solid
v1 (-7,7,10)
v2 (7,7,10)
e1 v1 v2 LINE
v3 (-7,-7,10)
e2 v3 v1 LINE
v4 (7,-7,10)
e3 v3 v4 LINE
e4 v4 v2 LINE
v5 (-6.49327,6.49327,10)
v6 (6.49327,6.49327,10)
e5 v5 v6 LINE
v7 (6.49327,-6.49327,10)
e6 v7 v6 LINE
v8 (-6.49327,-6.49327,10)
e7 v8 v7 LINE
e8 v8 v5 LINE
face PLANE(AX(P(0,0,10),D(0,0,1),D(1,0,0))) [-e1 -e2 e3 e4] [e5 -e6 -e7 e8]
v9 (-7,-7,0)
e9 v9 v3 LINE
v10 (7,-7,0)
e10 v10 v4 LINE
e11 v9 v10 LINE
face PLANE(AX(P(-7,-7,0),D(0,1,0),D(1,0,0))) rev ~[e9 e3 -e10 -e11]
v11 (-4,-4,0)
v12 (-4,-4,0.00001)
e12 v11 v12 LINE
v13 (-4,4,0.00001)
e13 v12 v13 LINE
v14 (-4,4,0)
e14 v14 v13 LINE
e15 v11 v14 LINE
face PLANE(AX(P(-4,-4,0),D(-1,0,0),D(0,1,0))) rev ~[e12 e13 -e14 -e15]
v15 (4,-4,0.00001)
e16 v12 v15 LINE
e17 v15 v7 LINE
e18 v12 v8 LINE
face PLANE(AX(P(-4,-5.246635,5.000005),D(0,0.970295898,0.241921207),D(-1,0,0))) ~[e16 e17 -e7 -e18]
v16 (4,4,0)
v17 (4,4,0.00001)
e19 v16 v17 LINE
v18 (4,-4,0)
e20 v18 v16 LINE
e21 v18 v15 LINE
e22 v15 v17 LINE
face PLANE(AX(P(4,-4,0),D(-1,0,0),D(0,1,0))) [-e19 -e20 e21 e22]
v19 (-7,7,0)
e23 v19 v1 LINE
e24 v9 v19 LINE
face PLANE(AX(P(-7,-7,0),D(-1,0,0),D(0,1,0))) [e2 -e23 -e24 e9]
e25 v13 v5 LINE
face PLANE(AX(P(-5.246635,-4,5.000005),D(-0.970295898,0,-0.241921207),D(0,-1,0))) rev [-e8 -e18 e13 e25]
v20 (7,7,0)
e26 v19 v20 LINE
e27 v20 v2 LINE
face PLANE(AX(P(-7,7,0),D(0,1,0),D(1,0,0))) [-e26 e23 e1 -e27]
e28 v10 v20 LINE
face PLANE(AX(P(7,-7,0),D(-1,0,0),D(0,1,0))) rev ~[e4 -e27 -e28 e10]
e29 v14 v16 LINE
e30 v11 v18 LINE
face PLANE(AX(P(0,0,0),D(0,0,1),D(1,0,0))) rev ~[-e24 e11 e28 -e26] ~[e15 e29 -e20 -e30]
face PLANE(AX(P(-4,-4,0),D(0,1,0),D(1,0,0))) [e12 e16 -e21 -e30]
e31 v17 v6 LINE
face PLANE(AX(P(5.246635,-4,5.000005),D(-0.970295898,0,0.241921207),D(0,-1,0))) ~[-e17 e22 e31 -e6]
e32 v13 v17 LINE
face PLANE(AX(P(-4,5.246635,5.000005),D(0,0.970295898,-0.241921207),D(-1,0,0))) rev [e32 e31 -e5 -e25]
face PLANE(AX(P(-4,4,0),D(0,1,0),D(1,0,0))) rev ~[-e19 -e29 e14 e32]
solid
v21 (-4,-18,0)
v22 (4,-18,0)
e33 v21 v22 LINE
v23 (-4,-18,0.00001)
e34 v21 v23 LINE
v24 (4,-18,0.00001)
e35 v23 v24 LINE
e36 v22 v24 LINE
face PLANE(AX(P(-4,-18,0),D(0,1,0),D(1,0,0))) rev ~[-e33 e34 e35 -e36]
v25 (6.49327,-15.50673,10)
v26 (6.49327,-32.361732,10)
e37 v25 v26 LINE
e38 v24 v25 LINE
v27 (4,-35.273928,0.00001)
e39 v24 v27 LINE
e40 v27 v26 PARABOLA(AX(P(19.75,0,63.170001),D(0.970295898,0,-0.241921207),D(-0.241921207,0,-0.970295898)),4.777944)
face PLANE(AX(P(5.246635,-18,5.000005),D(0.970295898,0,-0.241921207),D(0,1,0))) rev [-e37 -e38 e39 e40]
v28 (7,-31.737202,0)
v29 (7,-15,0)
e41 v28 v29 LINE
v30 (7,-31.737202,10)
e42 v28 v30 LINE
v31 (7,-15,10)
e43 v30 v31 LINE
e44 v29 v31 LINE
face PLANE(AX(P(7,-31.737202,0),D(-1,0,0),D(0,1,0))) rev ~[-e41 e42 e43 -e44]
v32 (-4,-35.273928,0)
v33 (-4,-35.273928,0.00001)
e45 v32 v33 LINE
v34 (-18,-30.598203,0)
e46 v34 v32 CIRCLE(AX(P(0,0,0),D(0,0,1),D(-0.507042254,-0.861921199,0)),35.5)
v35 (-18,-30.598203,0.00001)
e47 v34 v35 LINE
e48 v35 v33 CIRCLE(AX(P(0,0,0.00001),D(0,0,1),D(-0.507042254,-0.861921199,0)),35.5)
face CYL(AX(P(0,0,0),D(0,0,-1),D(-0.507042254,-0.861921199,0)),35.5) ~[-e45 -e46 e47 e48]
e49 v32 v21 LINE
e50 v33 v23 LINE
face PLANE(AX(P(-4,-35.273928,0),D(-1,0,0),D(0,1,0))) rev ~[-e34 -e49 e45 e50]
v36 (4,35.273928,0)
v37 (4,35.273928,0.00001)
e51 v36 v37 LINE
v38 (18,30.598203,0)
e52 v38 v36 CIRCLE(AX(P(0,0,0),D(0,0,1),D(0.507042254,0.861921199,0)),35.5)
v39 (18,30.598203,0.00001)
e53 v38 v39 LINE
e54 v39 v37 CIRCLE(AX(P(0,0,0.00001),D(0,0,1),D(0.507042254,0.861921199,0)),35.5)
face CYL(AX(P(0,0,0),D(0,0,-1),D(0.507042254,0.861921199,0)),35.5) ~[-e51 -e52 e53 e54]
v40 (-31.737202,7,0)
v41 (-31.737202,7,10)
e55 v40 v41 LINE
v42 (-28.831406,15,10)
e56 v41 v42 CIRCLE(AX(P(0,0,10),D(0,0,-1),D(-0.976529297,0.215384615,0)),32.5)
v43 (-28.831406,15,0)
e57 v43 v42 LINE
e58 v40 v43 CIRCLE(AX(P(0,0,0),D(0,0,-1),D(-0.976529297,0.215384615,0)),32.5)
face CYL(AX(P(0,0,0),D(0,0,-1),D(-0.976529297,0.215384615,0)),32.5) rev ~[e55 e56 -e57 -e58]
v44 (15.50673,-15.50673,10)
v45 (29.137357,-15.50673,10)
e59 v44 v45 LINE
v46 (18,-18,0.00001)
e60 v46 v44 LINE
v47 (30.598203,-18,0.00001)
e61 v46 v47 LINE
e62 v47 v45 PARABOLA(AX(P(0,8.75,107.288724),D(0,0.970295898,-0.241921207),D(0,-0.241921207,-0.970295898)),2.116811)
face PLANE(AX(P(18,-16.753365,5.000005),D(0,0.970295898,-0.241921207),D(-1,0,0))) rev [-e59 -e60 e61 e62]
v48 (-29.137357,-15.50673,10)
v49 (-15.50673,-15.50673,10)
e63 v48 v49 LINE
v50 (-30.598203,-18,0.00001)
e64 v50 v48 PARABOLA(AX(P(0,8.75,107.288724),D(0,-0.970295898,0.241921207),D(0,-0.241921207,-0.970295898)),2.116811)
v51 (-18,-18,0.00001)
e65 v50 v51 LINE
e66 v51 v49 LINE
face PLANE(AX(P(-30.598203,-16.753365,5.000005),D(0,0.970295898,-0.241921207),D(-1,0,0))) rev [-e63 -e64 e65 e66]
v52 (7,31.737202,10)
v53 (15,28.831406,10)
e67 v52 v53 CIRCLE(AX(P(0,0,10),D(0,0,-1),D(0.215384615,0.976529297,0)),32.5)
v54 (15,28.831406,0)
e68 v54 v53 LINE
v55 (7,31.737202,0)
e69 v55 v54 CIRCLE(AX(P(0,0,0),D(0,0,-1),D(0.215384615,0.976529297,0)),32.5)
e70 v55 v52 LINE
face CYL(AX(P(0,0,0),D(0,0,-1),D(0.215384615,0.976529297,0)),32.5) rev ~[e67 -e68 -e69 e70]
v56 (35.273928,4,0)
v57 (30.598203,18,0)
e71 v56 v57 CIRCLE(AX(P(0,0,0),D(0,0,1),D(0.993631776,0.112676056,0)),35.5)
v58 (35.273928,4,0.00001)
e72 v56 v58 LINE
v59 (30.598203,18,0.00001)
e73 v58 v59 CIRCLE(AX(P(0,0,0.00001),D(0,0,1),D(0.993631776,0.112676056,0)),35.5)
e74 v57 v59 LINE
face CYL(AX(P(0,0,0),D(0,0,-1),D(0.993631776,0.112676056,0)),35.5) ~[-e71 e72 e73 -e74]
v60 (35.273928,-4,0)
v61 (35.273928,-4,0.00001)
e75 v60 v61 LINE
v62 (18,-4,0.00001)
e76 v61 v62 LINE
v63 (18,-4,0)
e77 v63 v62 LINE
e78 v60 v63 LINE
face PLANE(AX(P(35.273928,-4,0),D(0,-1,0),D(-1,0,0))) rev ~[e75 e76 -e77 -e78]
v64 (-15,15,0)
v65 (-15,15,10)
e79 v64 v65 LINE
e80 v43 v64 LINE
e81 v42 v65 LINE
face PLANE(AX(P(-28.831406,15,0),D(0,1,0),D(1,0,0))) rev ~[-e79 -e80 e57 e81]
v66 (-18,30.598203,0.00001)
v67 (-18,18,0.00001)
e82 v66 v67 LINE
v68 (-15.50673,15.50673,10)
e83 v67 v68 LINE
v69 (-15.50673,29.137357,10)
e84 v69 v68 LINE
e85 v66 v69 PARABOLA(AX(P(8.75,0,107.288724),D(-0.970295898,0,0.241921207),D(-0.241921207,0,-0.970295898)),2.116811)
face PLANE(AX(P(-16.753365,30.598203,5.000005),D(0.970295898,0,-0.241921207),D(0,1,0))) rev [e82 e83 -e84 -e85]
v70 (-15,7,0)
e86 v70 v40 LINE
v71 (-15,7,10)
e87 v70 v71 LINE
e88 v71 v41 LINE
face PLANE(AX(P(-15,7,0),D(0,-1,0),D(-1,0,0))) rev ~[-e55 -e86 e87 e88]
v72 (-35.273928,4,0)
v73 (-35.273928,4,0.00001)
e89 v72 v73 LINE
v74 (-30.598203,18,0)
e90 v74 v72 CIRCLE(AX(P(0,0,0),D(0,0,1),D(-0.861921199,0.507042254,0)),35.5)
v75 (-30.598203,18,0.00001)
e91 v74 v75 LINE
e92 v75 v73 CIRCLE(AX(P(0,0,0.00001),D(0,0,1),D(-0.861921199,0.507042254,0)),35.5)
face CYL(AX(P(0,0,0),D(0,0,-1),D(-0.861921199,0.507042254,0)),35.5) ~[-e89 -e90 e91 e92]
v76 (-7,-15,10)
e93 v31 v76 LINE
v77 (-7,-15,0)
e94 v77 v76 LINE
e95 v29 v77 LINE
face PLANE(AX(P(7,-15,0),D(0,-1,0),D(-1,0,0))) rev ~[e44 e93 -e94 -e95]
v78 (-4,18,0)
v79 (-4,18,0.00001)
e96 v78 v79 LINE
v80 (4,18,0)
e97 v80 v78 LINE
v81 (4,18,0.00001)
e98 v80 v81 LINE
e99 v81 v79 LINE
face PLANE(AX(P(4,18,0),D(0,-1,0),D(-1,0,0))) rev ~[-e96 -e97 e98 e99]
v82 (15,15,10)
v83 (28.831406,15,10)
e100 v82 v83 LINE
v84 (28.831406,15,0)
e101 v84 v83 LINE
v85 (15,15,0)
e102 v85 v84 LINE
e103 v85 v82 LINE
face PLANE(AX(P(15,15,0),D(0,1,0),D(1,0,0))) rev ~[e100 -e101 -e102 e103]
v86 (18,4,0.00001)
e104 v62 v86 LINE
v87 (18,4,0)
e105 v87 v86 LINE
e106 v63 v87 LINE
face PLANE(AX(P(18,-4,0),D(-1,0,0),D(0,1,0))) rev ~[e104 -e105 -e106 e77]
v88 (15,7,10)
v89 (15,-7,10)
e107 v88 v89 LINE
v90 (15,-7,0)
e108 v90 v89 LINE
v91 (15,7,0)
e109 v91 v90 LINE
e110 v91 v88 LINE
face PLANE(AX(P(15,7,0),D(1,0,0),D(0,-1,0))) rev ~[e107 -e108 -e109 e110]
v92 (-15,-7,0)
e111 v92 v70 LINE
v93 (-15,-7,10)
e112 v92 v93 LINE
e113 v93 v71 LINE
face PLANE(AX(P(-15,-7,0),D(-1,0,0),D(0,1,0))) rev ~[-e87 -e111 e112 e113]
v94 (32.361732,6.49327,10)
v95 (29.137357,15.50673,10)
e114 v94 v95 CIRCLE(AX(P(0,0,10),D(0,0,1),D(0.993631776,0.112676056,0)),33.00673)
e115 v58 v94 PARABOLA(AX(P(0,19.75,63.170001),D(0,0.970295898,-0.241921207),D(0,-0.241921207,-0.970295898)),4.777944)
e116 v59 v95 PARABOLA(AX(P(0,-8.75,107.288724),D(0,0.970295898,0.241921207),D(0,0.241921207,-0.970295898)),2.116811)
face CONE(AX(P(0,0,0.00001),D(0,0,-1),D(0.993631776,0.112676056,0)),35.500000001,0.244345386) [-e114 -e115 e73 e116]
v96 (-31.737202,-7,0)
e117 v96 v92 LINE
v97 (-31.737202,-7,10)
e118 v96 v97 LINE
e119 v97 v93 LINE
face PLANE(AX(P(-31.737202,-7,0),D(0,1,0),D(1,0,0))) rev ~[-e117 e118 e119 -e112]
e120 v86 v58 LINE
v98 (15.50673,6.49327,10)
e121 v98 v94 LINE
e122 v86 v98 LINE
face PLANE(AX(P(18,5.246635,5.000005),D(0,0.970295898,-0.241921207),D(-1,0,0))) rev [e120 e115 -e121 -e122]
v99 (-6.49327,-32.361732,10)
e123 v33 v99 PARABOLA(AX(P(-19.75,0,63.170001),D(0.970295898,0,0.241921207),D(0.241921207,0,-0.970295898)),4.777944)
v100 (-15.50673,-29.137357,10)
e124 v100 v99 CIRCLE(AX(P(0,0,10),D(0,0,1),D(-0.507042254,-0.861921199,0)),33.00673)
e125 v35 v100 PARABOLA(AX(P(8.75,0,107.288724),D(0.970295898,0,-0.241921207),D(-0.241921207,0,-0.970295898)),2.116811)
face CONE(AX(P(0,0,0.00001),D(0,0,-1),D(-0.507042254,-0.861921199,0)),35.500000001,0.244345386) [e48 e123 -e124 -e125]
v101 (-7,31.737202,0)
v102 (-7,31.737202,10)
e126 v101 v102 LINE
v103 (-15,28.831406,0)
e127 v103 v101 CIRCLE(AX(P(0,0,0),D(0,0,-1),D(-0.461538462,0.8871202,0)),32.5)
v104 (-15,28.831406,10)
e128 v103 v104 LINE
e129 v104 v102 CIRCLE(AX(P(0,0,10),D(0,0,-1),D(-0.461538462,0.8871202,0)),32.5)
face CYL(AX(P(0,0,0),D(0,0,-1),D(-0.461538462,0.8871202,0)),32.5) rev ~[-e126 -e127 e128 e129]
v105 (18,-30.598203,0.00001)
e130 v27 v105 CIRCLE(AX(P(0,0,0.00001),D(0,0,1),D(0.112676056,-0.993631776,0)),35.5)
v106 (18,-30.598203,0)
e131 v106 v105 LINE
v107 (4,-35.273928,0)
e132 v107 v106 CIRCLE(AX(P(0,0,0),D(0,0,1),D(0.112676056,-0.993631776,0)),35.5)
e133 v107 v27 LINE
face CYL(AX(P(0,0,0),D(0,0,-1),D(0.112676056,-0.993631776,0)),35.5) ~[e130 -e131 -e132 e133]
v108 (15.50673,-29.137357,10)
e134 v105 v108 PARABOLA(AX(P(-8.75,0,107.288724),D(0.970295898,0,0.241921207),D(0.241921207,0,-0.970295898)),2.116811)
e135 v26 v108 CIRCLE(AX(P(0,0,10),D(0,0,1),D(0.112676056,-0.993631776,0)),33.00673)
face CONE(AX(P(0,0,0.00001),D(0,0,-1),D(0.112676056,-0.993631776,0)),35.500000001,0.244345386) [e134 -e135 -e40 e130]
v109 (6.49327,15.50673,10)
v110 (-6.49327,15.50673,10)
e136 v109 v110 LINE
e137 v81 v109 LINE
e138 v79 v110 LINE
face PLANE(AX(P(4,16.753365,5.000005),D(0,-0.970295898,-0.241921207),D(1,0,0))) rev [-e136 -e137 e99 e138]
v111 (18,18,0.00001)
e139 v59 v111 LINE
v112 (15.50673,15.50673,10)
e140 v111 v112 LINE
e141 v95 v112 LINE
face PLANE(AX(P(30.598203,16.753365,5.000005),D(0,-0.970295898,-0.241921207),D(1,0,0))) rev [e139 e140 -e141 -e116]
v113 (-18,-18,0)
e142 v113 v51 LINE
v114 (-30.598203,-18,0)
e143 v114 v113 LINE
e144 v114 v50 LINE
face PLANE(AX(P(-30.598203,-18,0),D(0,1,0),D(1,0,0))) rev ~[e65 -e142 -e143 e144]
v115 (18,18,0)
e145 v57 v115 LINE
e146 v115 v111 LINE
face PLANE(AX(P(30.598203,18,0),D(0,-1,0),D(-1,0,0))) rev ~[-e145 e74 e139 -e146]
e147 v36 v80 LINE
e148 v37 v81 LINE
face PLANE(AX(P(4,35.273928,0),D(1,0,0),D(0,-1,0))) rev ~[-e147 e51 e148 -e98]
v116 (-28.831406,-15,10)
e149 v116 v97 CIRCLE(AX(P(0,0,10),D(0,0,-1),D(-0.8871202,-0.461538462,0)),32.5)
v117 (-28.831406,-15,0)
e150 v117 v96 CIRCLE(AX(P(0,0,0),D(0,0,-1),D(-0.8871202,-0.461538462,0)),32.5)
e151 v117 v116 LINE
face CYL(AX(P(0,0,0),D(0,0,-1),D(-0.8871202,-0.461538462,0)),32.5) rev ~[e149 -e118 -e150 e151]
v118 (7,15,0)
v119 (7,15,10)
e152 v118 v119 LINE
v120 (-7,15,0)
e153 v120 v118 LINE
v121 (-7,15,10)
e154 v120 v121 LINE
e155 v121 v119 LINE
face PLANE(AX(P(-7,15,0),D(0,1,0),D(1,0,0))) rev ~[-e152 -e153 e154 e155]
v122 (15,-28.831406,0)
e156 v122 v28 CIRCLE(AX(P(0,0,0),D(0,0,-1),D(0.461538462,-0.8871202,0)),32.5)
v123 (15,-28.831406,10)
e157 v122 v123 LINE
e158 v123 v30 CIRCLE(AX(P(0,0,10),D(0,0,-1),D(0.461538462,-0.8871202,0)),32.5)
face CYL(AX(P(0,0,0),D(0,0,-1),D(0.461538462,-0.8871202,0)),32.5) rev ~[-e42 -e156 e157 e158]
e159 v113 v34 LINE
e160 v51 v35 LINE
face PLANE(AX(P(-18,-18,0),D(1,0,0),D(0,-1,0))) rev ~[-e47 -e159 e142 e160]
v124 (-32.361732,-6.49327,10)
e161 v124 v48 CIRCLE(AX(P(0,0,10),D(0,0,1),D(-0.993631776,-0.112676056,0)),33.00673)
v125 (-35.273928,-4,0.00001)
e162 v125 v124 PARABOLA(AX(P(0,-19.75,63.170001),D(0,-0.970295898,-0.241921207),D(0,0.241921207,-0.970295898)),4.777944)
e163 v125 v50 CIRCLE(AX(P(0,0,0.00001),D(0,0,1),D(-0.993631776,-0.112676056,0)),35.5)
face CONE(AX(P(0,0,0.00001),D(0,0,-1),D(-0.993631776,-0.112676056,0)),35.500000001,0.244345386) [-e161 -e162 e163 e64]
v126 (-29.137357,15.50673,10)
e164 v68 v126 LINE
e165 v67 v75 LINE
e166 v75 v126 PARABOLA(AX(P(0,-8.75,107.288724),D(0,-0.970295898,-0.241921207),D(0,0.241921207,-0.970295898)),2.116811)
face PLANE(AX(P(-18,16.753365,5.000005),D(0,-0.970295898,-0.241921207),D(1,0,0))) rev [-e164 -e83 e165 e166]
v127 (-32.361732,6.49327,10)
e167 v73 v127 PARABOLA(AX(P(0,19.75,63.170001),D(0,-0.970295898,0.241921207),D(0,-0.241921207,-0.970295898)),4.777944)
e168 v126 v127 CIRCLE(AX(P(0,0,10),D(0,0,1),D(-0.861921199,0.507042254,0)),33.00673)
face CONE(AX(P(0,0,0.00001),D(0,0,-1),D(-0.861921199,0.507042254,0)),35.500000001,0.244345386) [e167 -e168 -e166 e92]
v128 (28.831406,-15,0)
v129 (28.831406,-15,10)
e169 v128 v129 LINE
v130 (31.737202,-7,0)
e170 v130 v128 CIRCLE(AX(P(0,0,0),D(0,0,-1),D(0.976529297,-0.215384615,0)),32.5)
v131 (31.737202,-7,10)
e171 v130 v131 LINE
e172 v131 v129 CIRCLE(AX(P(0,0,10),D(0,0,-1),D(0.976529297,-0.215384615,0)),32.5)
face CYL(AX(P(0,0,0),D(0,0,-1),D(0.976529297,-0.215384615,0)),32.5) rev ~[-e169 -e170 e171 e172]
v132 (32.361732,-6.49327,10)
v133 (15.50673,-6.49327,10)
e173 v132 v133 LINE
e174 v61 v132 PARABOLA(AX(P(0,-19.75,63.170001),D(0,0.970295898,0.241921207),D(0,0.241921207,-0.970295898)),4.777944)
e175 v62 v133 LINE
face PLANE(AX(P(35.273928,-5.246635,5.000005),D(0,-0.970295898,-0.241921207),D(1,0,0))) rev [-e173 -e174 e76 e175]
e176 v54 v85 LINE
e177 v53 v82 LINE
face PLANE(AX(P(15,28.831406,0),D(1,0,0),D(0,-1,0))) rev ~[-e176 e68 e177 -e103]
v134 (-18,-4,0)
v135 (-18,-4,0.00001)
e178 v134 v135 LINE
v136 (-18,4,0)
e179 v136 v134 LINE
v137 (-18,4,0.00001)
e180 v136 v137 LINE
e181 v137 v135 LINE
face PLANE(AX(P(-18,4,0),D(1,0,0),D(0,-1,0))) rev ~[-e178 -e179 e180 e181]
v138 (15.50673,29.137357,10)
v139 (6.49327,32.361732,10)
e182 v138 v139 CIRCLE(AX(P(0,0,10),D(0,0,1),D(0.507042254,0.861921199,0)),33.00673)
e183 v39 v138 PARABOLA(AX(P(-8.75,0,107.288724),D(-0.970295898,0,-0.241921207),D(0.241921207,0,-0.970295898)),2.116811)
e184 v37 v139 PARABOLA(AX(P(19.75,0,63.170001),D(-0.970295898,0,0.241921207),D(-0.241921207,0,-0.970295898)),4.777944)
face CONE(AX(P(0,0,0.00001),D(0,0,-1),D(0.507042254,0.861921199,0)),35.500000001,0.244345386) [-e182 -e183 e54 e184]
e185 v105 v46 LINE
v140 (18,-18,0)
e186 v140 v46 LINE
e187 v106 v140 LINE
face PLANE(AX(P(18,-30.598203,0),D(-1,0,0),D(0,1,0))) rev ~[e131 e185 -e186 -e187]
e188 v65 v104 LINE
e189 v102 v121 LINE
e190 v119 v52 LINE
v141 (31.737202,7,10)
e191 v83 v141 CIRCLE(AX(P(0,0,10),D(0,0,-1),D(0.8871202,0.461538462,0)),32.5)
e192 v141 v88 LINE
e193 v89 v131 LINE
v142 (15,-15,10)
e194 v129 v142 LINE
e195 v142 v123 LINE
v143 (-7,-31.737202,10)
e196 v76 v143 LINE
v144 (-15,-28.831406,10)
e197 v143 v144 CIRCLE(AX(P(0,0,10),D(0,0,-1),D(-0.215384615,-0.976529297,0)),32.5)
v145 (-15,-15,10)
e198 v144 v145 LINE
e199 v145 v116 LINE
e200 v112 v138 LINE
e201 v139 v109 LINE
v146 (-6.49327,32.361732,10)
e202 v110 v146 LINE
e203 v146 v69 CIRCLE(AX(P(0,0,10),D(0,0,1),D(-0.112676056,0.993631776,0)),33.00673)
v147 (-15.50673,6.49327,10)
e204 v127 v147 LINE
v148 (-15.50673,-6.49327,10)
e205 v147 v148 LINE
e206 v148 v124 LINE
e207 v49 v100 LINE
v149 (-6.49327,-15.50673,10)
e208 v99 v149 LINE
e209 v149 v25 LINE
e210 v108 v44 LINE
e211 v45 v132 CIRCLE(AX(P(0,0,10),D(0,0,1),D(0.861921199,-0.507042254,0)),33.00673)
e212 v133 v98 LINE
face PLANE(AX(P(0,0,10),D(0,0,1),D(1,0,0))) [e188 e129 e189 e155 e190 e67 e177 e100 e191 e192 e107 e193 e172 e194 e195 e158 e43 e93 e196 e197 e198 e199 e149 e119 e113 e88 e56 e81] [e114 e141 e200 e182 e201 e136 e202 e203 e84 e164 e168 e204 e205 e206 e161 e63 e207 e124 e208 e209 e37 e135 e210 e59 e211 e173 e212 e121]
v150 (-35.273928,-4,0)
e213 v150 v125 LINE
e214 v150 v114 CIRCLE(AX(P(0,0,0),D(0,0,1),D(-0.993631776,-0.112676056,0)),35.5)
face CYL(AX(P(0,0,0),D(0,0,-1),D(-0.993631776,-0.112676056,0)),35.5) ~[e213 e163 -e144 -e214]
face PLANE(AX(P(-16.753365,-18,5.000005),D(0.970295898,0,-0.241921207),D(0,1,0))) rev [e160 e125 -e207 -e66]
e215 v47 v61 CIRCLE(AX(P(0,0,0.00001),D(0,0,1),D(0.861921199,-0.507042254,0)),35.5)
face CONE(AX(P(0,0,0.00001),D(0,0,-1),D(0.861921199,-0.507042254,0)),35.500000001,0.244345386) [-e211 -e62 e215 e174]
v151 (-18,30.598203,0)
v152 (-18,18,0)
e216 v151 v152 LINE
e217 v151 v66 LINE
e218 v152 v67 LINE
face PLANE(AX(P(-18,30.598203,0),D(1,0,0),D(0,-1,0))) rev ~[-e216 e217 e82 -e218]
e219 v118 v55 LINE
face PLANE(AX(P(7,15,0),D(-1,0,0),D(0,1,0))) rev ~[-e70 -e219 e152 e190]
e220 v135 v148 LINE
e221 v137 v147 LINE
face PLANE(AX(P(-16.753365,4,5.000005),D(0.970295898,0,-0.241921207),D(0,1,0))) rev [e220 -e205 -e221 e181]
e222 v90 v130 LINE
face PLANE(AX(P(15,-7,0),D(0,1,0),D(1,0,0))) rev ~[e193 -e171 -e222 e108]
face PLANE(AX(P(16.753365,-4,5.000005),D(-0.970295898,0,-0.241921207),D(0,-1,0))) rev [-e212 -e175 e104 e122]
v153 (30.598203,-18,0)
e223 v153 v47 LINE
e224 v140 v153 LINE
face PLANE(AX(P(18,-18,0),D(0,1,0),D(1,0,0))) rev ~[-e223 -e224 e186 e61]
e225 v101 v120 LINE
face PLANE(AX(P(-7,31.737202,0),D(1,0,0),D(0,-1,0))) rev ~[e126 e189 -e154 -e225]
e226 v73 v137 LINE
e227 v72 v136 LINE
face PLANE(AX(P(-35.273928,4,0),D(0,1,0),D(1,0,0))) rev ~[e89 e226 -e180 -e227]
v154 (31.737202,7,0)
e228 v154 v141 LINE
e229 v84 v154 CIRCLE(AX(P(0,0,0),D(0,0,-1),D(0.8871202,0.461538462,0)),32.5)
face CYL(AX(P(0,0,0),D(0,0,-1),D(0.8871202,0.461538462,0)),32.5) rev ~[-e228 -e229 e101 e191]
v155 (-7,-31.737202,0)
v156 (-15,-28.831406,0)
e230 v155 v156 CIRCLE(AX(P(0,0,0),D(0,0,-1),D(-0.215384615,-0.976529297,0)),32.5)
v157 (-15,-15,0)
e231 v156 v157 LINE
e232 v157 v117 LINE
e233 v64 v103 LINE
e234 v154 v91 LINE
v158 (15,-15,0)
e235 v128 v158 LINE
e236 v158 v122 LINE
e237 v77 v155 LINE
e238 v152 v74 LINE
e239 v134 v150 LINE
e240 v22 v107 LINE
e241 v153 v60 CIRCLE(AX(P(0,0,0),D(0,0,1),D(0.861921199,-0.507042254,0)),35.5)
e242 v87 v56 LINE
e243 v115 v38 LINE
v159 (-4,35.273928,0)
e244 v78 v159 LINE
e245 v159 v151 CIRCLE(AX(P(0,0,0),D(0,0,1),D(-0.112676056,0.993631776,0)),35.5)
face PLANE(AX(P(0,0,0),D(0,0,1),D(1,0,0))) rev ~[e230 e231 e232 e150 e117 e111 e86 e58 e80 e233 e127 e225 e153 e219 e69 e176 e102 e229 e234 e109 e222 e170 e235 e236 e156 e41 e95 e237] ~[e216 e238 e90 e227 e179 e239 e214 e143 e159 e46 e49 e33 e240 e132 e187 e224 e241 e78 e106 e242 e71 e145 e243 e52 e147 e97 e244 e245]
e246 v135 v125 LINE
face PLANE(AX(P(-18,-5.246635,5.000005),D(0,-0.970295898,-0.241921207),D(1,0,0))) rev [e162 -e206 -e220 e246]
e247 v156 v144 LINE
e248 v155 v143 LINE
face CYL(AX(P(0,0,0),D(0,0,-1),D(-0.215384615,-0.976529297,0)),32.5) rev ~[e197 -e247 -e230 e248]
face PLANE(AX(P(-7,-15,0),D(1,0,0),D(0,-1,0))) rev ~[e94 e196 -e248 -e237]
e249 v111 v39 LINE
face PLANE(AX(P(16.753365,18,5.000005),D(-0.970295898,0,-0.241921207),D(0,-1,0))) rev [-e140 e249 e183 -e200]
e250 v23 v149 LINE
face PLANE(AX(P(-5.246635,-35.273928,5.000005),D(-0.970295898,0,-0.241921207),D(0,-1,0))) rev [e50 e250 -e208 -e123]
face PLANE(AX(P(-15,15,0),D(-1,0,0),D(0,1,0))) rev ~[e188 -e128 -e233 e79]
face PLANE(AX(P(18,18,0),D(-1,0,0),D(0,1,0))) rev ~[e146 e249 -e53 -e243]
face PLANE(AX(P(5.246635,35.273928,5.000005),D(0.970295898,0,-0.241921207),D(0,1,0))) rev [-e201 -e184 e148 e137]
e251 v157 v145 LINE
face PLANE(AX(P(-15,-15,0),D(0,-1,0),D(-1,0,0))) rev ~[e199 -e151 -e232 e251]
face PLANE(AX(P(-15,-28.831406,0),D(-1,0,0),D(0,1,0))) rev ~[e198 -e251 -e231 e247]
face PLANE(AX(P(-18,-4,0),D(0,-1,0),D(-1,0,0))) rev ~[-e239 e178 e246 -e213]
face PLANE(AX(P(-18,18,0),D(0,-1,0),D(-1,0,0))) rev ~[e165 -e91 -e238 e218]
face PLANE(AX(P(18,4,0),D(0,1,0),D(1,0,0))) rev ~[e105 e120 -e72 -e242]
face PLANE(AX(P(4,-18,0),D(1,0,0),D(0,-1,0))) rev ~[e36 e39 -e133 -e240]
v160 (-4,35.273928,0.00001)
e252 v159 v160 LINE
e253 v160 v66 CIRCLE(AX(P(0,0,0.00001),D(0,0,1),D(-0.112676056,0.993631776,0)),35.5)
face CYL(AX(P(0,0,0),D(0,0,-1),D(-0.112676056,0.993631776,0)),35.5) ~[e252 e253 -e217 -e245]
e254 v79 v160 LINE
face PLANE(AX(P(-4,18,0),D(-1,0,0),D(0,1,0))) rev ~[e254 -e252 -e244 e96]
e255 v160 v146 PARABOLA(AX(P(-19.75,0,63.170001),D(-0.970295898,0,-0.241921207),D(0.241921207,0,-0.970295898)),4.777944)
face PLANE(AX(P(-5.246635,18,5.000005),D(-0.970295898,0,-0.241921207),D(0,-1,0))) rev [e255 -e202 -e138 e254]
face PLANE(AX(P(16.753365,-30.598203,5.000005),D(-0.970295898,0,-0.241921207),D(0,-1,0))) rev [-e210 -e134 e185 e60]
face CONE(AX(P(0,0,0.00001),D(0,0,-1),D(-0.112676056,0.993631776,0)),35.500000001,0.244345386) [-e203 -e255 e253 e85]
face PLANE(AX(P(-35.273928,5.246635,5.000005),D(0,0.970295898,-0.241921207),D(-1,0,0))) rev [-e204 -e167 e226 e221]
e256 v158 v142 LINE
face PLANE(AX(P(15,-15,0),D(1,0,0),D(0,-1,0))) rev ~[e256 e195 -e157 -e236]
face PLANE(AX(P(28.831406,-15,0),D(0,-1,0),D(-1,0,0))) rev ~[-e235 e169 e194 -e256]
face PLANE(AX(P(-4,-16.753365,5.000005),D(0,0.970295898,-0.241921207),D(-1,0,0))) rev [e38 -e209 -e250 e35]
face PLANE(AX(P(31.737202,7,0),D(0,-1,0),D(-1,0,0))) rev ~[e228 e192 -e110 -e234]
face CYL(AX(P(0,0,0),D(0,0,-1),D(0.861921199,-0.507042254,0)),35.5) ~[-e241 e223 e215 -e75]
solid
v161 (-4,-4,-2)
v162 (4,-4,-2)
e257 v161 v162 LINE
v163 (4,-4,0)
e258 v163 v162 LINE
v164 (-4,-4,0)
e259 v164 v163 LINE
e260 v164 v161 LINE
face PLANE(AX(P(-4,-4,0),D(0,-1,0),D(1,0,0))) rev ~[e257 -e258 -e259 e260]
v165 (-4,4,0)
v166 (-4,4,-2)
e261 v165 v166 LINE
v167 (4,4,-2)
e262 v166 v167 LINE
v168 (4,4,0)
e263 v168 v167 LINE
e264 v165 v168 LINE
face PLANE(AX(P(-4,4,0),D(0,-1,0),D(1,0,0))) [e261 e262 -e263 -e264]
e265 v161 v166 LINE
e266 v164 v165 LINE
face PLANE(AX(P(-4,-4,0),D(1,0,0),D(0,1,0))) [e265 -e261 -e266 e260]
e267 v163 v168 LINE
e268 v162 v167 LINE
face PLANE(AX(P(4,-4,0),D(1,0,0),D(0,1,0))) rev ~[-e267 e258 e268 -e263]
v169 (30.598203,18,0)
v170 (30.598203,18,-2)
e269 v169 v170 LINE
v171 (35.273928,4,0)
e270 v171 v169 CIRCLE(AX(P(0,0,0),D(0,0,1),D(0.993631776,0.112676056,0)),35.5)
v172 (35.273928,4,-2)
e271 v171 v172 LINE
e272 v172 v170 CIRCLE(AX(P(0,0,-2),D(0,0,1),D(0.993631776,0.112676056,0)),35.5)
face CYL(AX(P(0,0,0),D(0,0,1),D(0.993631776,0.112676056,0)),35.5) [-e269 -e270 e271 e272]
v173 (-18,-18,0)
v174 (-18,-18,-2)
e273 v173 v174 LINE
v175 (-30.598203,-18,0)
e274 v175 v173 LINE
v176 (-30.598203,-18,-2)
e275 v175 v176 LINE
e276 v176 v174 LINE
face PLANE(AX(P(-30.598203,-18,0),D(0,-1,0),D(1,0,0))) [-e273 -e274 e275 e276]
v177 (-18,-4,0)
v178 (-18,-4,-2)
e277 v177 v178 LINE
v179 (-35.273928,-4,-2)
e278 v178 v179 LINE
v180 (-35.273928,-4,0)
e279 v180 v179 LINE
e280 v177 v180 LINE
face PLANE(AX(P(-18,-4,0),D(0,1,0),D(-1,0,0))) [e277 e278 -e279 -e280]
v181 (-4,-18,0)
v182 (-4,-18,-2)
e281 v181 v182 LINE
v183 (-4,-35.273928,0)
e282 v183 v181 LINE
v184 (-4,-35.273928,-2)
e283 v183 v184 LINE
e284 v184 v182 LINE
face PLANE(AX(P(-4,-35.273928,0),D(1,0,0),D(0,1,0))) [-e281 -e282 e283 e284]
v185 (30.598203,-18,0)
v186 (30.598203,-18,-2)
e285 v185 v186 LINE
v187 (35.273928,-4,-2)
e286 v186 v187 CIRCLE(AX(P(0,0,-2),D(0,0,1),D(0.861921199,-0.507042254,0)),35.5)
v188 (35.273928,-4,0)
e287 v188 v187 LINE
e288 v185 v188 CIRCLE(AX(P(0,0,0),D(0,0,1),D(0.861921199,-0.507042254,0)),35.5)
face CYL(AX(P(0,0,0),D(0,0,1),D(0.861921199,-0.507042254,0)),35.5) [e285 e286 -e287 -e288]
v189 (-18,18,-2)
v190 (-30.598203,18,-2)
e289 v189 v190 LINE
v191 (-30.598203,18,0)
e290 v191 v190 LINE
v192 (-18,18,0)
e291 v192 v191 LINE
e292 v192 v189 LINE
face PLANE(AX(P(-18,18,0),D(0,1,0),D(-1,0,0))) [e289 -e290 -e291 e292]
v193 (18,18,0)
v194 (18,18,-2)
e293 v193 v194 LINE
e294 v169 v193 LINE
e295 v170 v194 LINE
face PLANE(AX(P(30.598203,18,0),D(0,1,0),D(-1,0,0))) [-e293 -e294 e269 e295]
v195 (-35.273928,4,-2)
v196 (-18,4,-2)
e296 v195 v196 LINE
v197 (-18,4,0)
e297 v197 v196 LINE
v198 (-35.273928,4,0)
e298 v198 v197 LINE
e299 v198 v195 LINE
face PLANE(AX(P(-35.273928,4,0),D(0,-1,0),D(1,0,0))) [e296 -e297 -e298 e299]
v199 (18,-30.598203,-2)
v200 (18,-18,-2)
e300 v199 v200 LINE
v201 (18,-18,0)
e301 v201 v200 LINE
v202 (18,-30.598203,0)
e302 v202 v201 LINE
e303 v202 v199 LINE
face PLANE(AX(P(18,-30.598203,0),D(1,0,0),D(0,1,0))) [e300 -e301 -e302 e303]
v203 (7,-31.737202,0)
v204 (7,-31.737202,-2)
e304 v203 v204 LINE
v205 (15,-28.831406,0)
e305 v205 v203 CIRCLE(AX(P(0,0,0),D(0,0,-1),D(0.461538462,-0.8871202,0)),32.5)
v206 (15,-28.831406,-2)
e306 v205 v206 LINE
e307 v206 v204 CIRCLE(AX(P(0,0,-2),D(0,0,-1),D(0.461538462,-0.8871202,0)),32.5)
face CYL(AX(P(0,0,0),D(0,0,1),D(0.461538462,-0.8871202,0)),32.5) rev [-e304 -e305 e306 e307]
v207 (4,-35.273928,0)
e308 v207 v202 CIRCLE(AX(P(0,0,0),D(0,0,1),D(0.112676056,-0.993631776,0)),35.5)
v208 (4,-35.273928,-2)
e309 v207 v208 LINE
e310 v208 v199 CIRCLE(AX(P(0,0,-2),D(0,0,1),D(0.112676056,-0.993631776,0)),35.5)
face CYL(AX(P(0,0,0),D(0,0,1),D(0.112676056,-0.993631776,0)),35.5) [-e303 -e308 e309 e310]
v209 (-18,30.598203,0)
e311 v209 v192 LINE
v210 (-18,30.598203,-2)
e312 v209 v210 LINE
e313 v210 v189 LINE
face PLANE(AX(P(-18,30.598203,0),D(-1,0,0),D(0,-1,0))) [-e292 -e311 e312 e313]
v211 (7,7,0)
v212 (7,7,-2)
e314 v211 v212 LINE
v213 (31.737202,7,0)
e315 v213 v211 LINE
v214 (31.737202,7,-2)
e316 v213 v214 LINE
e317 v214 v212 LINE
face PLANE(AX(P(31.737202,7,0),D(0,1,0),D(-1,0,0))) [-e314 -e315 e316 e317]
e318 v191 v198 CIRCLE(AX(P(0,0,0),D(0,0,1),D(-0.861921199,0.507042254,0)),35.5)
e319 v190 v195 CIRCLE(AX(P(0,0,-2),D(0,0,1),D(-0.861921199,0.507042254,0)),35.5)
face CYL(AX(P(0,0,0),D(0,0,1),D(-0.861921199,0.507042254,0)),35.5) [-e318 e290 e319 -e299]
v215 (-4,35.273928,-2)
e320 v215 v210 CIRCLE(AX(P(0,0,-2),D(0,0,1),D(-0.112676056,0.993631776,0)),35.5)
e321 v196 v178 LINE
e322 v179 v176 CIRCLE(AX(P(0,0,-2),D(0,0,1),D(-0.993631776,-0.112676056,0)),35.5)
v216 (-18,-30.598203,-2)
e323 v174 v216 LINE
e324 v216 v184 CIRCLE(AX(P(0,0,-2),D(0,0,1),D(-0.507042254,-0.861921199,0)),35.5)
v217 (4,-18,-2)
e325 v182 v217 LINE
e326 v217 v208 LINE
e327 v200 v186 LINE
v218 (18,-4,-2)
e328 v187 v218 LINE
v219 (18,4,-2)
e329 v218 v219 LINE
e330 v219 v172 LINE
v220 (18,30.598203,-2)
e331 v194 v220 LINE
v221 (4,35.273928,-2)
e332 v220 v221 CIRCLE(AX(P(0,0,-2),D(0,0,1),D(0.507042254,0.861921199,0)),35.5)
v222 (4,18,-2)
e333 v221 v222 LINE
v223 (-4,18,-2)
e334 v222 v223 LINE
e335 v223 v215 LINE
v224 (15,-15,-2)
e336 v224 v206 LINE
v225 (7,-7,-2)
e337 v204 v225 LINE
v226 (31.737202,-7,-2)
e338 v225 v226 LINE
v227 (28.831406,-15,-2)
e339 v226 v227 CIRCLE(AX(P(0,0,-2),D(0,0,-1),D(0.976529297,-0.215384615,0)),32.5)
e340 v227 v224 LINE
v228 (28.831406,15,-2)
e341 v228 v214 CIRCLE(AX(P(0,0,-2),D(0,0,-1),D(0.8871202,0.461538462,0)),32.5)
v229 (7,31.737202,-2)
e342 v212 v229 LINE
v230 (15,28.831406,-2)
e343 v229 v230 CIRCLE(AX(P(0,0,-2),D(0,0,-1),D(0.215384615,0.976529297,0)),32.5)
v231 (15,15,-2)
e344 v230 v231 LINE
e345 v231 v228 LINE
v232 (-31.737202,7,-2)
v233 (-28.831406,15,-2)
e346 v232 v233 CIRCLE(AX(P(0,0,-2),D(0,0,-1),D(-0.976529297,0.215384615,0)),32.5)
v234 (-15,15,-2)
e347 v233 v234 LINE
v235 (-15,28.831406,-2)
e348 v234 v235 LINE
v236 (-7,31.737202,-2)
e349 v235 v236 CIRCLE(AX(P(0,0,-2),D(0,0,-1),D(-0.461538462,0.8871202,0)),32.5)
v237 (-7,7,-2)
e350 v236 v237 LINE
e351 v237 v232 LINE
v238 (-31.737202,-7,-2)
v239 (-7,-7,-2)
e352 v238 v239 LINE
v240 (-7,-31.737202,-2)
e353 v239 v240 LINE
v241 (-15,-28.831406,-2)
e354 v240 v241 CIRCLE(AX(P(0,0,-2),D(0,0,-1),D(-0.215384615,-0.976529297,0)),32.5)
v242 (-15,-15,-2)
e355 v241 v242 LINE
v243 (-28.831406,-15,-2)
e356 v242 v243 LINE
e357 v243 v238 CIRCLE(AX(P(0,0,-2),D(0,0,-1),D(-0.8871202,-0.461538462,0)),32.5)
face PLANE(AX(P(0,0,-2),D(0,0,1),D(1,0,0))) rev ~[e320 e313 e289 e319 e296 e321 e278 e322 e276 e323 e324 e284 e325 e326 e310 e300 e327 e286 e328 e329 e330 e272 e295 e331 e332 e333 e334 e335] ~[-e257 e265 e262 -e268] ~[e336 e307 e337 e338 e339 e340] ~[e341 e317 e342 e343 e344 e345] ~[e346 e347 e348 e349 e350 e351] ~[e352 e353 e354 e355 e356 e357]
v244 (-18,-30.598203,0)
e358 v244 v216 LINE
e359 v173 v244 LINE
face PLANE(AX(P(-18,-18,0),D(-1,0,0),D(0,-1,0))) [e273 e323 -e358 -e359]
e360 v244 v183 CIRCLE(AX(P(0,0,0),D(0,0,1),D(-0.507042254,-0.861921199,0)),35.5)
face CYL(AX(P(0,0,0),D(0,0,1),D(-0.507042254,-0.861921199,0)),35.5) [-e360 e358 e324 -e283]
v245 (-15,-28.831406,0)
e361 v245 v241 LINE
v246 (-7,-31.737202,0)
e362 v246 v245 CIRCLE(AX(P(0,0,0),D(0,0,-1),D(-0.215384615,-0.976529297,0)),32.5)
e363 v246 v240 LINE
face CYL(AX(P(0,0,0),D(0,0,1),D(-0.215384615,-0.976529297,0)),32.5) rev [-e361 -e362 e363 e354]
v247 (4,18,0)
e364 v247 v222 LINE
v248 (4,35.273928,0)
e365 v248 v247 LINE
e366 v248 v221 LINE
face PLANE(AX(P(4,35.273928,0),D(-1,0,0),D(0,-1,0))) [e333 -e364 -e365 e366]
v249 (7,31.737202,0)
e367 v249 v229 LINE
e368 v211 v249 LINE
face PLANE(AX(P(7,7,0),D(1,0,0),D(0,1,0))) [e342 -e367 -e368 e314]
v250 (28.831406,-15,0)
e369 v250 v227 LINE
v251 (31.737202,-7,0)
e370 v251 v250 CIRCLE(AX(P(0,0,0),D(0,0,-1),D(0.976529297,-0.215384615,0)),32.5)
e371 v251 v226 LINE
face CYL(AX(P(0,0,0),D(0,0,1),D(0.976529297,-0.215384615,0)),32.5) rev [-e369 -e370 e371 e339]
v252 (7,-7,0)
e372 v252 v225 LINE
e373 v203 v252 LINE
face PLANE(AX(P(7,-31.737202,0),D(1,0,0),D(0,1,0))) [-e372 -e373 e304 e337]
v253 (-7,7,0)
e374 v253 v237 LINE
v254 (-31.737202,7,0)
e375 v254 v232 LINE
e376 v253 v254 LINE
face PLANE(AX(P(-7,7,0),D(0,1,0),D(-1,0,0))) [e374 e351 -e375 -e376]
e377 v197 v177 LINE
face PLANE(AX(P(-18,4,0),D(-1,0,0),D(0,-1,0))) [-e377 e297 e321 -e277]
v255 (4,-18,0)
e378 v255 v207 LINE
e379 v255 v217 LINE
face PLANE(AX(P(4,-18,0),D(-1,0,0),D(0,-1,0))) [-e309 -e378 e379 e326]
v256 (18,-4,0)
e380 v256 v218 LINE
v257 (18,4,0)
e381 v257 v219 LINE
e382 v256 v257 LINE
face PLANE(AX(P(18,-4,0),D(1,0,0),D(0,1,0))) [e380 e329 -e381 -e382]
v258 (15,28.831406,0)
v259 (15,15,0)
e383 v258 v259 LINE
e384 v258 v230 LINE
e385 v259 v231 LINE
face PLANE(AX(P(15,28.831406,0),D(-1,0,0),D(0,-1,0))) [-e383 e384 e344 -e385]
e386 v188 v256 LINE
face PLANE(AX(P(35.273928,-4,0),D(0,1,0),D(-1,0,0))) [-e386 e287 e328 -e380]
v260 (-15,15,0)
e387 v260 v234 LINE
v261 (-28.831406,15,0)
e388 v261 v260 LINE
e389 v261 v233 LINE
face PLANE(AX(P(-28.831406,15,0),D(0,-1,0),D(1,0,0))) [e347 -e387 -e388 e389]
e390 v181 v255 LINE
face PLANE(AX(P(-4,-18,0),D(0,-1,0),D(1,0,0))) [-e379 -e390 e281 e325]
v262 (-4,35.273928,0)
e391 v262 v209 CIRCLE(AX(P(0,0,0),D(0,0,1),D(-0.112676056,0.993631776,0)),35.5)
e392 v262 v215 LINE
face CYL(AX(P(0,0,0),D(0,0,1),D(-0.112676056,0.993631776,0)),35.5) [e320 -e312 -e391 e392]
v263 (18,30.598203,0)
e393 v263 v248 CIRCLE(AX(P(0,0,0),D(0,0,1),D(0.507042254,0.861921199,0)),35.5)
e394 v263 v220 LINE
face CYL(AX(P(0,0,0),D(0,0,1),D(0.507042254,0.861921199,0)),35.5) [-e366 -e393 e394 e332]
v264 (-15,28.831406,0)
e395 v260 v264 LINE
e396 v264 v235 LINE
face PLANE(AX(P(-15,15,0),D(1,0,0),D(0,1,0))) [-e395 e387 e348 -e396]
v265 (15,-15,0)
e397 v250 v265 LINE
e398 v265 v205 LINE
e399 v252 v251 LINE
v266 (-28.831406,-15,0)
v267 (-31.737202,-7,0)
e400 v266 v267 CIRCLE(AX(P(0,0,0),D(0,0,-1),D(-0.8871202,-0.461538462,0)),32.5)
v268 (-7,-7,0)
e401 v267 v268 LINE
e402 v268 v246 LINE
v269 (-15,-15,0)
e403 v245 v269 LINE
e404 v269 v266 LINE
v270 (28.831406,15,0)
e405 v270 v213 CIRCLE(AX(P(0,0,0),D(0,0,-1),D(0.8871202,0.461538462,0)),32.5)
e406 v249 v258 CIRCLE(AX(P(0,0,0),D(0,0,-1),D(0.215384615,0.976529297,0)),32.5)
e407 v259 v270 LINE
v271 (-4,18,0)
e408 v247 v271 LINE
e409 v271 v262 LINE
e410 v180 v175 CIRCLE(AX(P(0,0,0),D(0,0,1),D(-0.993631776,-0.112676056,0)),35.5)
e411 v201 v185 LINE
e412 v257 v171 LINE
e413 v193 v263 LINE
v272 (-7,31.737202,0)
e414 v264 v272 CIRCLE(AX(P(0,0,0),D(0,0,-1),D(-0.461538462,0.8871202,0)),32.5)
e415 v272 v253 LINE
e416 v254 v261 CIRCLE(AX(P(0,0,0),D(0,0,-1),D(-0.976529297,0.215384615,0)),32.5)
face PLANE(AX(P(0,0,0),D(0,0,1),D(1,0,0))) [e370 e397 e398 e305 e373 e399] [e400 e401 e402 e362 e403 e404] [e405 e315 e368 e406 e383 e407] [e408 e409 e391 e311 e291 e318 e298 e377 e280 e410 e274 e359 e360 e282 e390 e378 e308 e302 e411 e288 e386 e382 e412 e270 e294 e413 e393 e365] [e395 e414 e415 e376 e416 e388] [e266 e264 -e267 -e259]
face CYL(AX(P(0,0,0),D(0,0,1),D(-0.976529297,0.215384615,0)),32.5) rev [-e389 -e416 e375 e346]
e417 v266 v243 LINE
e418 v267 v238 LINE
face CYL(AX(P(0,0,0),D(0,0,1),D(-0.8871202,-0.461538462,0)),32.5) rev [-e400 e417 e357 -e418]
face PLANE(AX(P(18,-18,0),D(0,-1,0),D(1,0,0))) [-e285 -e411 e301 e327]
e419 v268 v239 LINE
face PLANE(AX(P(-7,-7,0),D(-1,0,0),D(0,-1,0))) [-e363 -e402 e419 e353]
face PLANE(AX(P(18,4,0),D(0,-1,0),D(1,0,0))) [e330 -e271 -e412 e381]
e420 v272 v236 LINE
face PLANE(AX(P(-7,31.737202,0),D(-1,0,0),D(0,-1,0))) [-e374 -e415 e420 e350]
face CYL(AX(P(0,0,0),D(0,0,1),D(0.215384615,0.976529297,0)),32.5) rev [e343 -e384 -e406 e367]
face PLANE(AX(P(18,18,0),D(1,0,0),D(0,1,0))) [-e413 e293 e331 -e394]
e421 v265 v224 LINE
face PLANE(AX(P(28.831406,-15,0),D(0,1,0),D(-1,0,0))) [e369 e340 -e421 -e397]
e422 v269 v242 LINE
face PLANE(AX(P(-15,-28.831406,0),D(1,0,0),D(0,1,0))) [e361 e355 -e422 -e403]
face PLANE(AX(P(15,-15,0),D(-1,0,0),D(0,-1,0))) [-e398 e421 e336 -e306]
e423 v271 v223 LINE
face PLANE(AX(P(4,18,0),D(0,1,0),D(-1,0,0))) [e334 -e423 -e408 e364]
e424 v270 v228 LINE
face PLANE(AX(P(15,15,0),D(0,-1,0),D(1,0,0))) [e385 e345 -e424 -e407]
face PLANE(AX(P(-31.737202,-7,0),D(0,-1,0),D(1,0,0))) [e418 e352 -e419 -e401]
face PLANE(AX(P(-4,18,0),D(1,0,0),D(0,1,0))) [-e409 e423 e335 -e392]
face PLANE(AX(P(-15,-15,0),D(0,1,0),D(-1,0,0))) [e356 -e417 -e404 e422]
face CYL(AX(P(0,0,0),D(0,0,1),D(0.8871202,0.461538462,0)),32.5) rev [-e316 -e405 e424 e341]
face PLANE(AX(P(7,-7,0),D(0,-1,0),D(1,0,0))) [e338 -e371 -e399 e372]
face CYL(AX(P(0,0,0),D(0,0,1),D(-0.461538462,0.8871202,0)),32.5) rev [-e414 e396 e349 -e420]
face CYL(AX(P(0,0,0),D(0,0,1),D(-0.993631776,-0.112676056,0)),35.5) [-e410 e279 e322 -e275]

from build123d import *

# Parameters (mm, degrees)
F0_W     = 14
F0_H     = 14
F0_W_2   = 8
F0_H_2   = 8
F1_DEPTH = 10
F2_SIZE2 = 2.49327
F2_SIZE  = 9.99999
F3_SIZE2 = 2.49327
F3_SIZE  = 9.99999
F4_W     = 8
F4_H     = 8
F5_DEPTH = 2


# Not quite as in the source:
# - a fillet or chamfer is up to 0.001 mm smaller than in the source, because OpenCascade refuses the exact size
# - a feature names something its author has since deleted; it is built from what else it names


with BuildPart() as f1:
    # F0 (on Top) → F1 (new body)
    with BuildSketch(Plane.XY):
        Rectangle(F0_W, F0_H)
        Rectangle(F0_W_2, F0_H_2, mode=Mode.SUBTRACT)
    extrude(amount=F1_DEPTH)

    # F3 (size 10 and 2.4932800284 in the source; OpenCascade refuses exactly that, so slightly less here)
    f3_edges = [f1.edges().sort_by_distance(p)[0] for p in [
        (4, 0, 10),
        (0, -4, 10),
        (-4, 0, 10),
        (0, 4, 10),
    ]]
    chamfer(f3_edges, length=F3_SIZE, length2=F3_SIZE2)


with BuildPart() as f1b:
    # F0 (on Top) → F1, piece 2 (new body)
    with BuildSketch(Plane.XY):
        with BuildLine():
            ThreePointArc((-30.5982025616, 18), (-33.6717151002, 11.2456926069), (-35.2739280489, 4))
            Line((-35.2739280489, 4), (-18, 4))
            Line((-18, 4), (-18, -4))
            Line((-18, -4), (-35.2739280489, -4))
            ThreePointArc((-35.2739280489, -4), (-33.6717151002, -11.2456926069), (-30.5982025616, -18))
            Line((-30.5982025616, -18), (-18, -18))
            Line((-18, -18), (-18, -30.5982025616))
            ThreePointArc((-18, -30.5982025616), (-11.2456926069, -33.6717151002), (-4, -35.2739280489))
            Line((-4, -35.2739280489), (-4, -18))
            Line((-4, -18), (4, -18))
            Line((4, -18), (4, -35.2739280489))
            ThreePointArc((4, -35.2739280489), (11.2456926069, -33.6717151002), (18, -30.5982025616))
            Line((18, -30.5982025616), (18, -18))
            Line((18, -18), (30.5982025616, -18))
            ThreePointArc((30.5982025616, -18), (33.6717151002, -11.2456926069), (35.2739280489, -4))
            Line((35.2739280489, -4), (18, -4))
            Line((18, -4), (18, 4))
            Line((18, 4), (35.2739280489, 4))
            ThreePointArc((35.2739280489, 4), (33.6717151002, 11.2456926069), (30.5982025616, 18))
            Line((30.5982025616, 18), (18, 18))
            Line((18, 18), (18, 30.5982025616))
            ThreePointArc((18, 30.5982025616), (11.2456926069, 33.6717151002), (4, 35.2739280489))
            Line((4, 35.2739280489), (4, 18))
            Line((4, 18), (-4, 18))
            Line((-4, 18), (-4, 35.2739280489))
            ThreePointArc((-4, 35.2739280489), (-11.2456926069, 33.6717151002), (-18, 30.5982025616))
            Line((-18, 30.5982025616), (-18, 18))
            Line((-18, 18), (-30.5982025616, 18))
        make_face()
        with BuildLine():
            ThreePointArc((-31.7372021451, 7), (-30.5473253804, 11.0955356834), (-28.8314064867, 15))
            Line((-28.8314064867, 15), (-15, 15))
            Line((-15, 15), (-15, 28.8314064867))
            ThreePointArc((-15, 28.8314064867), (-11.0955356834, 30.5473253804), (-7, 31.7372021451))
            Line((-7, 31.7372021451), (-7, 15))
            Line((-7, 15), (7, 15))
            Line((7, 15), (7, 31.7372021451))
            ThreePointArc((7, 31.7372021451), (11.0955356834, 30.5473253804), (15, 28.8314064867))
            Line((15, 28.8314064867), (15, 15))
            Line((15, 15), (28.8314064867, 15))
            ThreePointArc((28.8314064867, 15), (30.5473253804, 11.0955356834), (31.7372021451, 7))
            Line((31.7372021451, 7), (15, 7))
            Line((15, 7), (15, -7))
            Line((15, -7), (31.7372021451, -7))
            ThreePointArc((31.7372021451, -7), (30.5473253804, -11.0955356834), (28.8314064867, -15))
            Line((28.8314064867, -15), (15, -15))
            Line((15, -15), (15, -28.8314064867))
            ThreePointArc((15, -28.8314064867), (11.0955356834, -30.5473253804), (7, -31.7372021451))
            Line((7, -31.7372021451), (7, -15))
            Line((7, -15), (-7, -15))
            Line((-7, -15), (-7, -31.7372021451))
            ThreePointArc((-7, -31.7372021451), (-11.0955356834, -30.5473253804), (-15, -28.8314064867))
            Line((-15, -28.8314064867), (-15, -15))
            Line((-15, -15), (-28.8314064867, -15))
            ThreePointArc((-28.8314064867, -15), (-30.5473253804, -11.0955356834), (-31.7372021451, -7))
            Line((-31.7372021451, -7), (-15, -7))
            Line((-15, -7), (-15, 7))
            Line((-15, 7), (-31.7372021451, 7))
        make_face(mode=Mode.SUBTRACT)
    extrude(amount=F1_DEPTH)

    # F2 (size 10 and 2.4932800284 in the source; OpenCascade refuses exactly that, so slightly less here)
    f2_edges = [f1b.edges().sort_by_distance(p)[0] for p in [
        (26.636964, -4, 10),
        (33.671715, -11.245693, 10),
        (24.299101, -18, 10),
        (18, -24.299101, 10),
        (11.245693, -33.671715, 10),
        (4, -26.636964, 10),
        (-4, -26.636964, 10),
        (-11.245693, -33.671715, 10),
        (-18, -24.299101, 10),
        (-24.299101, -18, 10),
        (-33.671715, -11.245693, 10),
        (-26.636964, -4, 10),
        (-18, 0, 10),
        (-26.636964, 4, 10),
        (-33.671715, 11.245693, 10),
        (-24.299101, 18, 10),
        (-18, 24.299101, 10),
        (-11.245693, 33.671715, 10),
        (-4, 26.636964, 10),
        (0, 18, 10),
        (4, 26.636964, 10),
        (11.245693, 33.671715, 10),
        (18, 24.299101, 10),
        (24.299101, 18, 10),
        (33.671715, 11.245693, 10),
        (26.636964, 4, 10),
        (18, 0, 10),
        (0, -18, 10),
    ]]
    chamfer(f2_edges, length=F2_SIZE, length2=F2_SIZE2)


with BuildPart() as f5:
    # F4 (on face) → F5 (new body)
    with BuildSketch(Plane.XY):
        with BuildLine():
            Line((-35.2739280489, 4), (-18, 4))
            Line((-18, 4), (-18, -4))
            Line((-18, -4), (-35.2739280489, -4))
            ThreePointArc((-35.2739280489, -4), (-33.6717151002, -11.2456926069), (-30.5982025616, -18))
            Line((-30.5982025616, -18), (-18, -18))
            Line((-18, -18), (-18, -30.5982025616))
            ThreePointArc((-18, -30.5982025616), (-11.2456926069, -33.6717151002), (-4, -35.2739280489))
            Line((-4, -35.2739280489), (-4, -18))
            Line((-4, -18), (4, -18))
            Line((4, -18), (4, -35.2739280489))
            ThreePointArc((4, -35.2739280489), (11.2456926069, -33.6717151002), (18, -30.5982025616))
            Line((18, -30.5982025616), (18, -18))
            Line((18, -18), (30.5982025616, -18))
            ThreePointArc((30.5982025616, -18), (33.6717151002, -11.2456926069), (35.2739280489, -4))
            Line((35.2739280489, -4), (18, -4))
            Line((18, -4), (18, 4))
            Line((18, 4), (35.2739280489, 4))
            ThreePointArc((35.2739280489, 4), (33.6717151002, 11.2456926069), (30.5982025616, 18))
            Line((30.5982025616, 18), (18, 18))
            Line((18, 18), (18, 30.5982025616))
            ThreePointArc((18, 30.5982025616), (11.2456926069, 33.6717151002), (4, 35.2739280489))
            Line((4, 35.2739280489), (4, 18))
            Line((4, 18), (-4, 18))
            Line((-4, 18), (-4, 35.2739280489))
            ThreePointArc((-4, 35.2739280489), (-11.2456926069, 33.6717151002), (-18, 30.5982025616))
            Line((-18, 30.5982025616), (-18, 18))
            Line((-18, 18), (-30.5982025616, 18))
            ThreePointArc((-30.5982025616, 18), (-33.6717151002, 11.2456926069), (-35.2739280489, 4))
        make_face()
        with BuildLine():
            ThreePointArc((-15, 28.8314064867), (-11.0955356834, 30.5473253804), (-7, 31.7372021451))
            Line((-7, 31.7372021451), (-7, 15))
            Line((-7, 15), (7, 15))
            Line((7, 15), (7, 31.7372021451))
            ThreePointArc((7, 31.7372021451), (11.0955356834, 30.5473253804), (15, 28.8314064867))
            Line((15, 28.8314064867), (15, 15))
            Line((15, 15), (28.8314064867, 15))
            ThreePointArc((28.8314064867, 15), (30.5473253804, 11.0955356834), (31.7372021451, 7))
            Line((31.7372021451, 7), (15, 7))
            Line((15, 7), (15, -7))
            Line((15, -7), (31.7372021451, -7))
            ThreePointArc((31.7372021451, -7), (30.5473253804, -11.0955356834), (28.8314064867, -15))
            Line((28.8314064867, -15), (15, -15))
            Line((15, -15), (15, -28.8314064867))
            ThreePointArc((15, -28.8314064867), (11.0955356834, -30.5473253804), (7, -31.7372021451))
            Line((7, -31.7372021451), (7, -15))
            Line((7, -15), (-7, -15))
            Line((-7, -15), (-7, -31.7372021451))
            ThreePointArc((-7, -31.7372021451), (-11.0955356834, -30.5473253804), (-15, -28.8314064867))
            Line((-15, -28.8314064867), (-15, -15))
            Line((-15, -15), (-28.8314064867, -15))
            ThreePointArc((-28.8314064867, -15), (-30.5473253804, -11.0955356834), (-31.7372021451, -7))
            Line((-31.7372021451, -7), (-15, -7))
            Line((-15, -7), (-15, 7))
            Line((-15, 7), (-31.7372021451, 7))
            ThreePointArc((-31.7372021451, 7), (-30.5473253804, 11.0955356834), (-28.8314064867, 15))
            Line((-28.8314064867, 15), (-15, 15))
            Line((-15, 15), (-15, 28.8314064867))
        make_face(mode=Mode.SUBTRACT)
        Polygon((7, 15), (-7, 15), (-7, 7), (-15, 7), (-15, -7), (-7, -7), (-7, -15), (7, -15), (7, -7), (15, -7), (15, 7), (7, 7), align=None)
        Rectangle(F4_W, F4_H, mode=Mode.SUBTRACT)
    extrude(amount=-F5_DEPTH)


solid = Compound([f1.part, f1b.part, f5.part])
